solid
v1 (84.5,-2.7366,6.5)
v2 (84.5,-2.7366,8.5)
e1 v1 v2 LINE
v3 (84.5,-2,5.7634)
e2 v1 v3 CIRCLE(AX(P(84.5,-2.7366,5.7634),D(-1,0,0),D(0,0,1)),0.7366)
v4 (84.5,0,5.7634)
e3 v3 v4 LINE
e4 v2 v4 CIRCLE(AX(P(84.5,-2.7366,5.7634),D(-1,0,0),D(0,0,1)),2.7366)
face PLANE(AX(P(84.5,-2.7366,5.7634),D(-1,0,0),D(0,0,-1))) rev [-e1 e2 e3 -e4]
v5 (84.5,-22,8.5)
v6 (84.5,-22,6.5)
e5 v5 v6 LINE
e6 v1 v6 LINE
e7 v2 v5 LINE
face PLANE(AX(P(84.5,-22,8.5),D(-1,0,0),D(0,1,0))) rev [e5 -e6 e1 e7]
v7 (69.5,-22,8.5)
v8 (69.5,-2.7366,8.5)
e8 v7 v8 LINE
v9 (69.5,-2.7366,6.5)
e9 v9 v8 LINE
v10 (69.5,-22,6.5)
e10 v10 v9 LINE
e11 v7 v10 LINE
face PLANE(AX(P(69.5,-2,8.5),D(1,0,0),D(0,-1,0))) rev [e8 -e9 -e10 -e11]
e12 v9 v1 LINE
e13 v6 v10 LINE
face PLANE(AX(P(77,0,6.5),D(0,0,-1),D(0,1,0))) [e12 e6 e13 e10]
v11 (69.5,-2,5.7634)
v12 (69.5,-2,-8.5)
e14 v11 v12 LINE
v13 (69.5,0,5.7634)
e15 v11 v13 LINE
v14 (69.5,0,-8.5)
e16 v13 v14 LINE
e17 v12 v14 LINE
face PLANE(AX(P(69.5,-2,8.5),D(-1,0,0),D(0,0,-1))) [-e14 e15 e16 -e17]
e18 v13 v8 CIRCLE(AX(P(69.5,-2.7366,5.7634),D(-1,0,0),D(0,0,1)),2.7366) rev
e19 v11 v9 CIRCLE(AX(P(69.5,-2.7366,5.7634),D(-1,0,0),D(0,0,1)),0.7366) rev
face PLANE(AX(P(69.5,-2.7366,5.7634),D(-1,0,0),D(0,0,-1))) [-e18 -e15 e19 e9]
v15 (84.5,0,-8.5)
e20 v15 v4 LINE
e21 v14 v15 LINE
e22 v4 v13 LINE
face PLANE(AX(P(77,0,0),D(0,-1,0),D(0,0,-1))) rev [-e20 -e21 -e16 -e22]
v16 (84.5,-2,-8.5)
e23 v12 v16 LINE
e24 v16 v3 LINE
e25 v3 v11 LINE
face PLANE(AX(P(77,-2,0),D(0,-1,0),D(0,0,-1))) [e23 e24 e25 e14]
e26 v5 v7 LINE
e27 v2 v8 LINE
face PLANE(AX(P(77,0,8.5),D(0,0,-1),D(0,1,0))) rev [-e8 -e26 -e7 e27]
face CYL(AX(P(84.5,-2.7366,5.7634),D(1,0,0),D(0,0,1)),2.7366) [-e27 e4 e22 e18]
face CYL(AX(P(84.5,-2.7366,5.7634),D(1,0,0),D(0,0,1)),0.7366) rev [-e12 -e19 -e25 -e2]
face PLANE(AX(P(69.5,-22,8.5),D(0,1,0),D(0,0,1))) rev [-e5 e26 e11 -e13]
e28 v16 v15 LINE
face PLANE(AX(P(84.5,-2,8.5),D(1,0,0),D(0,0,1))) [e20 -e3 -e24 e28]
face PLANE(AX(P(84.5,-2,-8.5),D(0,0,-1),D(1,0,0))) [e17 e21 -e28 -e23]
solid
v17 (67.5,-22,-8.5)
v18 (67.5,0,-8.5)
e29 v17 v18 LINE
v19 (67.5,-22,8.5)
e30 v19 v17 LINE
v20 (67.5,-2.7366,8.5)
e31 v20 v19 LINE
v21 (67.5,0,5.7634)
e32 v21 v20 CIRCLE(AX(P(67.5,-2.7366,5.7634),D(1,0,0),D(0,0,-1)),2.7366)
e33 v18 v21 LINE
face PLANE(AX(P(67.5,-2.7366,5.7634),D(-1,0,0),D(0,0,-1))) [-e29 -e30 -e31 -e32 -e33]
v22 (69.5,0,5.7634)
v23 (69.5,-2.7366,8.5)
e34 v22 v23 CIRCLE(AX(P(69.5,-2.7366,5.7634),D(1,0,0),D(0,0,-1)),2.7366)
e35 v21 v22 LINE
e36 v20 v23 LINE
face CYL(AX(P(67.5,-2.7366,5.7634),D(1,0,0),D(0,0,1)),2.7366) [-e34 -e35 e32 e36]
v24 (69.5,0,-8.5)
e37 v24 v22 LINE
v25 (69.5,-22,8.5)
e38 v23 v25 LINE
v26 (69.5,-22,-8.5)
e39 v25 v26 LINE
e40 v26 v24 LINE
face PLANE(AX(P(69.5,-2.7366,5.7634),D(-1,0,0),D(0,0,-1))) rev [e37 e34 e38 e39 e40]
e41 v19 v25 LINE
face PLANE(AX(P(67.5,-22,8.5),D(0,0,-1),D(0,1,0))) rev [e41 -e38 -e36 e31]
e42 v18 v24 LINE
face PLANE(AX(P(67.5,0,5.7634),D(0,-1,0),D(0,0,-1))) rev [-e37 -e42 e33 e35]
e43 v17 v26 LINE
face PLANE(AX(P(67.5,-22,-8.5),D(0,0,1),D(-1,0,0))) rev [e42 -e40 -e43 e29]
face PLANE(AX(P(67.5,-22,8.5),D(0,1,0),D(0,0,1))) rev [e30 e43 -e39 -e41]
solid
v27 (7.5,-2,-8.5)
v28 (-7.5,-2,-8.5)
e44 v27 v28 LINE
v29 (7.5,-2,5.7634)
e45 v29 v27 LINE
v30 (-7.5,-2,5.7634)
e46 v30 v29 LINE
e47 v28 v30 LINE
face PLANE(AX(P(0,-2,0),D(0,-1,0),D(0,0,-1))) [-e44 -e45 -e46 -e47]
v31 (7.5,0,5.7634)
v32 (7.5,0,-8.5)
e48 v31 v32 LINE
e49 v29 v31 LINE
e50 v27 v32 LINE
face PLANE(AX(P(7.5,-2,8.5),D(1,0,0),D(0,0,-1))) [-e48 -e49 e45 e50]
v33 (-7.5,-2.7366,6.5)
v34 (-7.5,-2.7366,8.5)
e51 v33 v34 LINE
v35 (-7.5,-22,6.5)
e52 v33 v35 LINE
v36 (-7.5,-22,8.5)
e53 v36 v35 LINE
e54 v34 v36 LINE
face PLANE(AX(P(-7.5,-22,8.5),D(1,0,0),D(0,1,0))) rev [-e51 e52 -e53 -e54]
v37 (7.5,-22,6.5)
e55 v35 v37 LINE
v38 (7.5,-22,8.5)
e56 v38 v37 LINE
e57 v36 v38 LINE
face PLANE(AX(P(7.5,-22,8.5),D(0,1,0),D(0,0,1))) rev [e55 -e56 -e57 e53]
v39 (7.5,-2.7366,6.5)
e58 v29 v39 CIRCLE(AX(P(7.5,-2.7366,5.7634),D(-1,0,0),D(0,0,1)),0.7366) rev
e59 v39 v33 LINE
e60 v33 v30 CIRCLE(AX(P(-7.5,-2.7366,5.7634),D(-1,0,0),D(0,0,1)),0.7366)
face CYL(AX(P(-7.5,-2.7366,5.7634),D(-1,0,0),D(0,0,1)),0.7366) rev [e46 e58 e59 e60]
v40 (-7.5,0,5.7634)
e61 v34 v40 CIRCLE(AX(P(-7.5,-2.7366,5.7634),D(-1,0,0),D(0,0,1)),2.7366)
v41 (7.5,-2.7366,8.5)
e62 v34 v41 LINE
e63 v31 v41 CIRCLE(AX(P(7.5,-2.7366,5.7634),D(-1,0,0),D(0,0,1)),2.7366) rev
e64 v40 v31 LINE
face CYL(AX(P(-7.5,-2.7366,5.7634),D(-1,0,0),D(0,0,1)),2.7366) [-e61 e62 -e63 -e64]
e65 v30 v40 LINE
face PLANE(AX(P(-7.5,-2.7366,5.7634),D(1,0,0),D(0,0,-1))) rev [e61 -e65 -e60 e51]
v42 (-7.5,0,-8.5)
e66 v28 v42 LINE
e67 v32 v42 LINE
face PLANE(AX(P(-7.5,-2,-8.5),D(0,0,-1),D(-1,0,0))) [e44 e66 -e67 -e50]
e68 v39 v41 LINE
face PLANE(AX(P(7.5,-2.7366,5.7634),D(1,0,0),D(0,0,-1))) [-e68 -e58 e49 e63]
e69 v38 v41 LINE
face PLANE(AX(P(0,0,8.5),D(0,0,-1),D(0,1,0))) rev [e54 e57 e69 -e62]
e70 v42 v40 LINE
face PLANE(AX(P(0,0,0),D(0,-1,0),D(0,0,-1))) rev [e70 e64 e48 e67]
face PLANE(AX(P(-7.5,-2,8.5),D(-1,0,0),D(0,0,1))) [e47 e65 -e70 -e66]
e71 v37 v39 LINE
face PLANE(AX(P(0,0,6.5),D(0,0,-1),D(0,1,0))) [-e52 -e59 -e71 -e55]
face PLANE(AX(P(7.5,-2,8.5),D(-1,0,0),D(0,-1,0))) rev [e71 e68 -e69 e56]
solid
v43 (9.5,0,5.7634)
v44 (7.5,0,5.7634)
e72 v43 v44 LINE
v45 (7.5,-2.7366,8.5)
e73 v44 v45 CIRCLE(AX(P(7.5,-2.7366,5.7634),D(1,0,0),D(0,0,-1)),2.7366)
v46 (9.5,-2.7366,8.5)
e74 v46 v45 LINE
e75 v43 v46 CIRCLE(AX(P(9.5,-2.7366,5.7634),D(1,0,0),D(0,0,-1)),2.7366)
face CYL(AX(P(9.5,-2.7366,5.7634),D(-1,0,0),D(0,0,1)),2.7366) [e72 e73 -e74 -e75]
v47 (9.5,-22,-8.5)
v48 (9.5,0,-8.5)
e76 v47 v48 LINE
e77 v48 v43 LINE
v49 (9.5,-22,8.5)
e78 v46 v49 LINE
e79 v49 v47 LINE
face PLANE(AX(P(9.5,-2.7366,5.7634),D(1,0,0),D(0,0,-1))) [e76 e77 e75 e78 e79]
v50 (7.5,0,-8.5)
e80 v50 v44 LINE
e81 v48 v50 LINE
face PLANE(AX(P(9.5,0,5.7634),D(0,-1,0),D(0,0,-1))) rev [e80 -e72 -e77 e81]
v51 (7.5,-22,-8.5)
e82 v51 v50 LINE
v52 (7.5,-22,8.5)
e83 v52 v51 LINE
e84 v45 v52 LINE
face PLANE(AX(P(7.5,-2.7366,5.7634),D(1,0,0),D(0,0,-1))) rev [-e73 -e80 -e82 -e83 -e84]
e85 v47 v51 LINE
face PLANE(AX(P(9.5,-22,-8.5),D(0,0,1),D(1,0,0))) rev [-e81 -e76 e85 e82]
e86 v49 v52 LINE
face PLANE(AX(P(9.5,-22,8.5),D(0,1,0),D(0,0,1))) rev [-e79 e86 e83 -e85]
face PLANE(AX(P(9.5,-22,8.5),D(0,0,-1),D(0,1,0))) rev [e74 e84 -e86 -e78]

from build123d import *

# Parameters (mm, degrees)
SKETCH1_W                    = 15
SKETCH1_H                    = 17
BASE_FLANGE1_DEPTH           = 2
EDGE_FLANGE1_STRIP_W         = 9.4732
EDGE_FLANGE1_STRIP_H         = 2
EDGE_FLANGE1_STRIP_CUT_DEPTH = 15
EDGE_FLANGE1_DEPTH           = 15
BASE_FLANGE2_START           = 2
BASE_FLANGE2_DEPTH           = 2


# Sheet-metal steps are written as plain solids
with BuildPart() as part:
    # Sketch1 → Base-Flange1 (new body)
    with BuildSketch(Plane(origin=(0, 0, 0), x_dir=(1, 0, 0), z_dir=(0, 1, 0))):
        Rectangle(SKETCH1_W, SKETCH1_H)
    extrude(amount=-BASE_FLANGE1_DEPTH)

    # Edge-Flange1 strip (across the edge) → Edge-Flange1 strip cut (cut)
    with BuildSketch(Plane(origin=(7.5, -2, 8.5), x_dir=(0, 0, -1), z_dir=(-1, 0, 0))):
        with Locations((-2, -1)):
            Rectangle(EDGE_FLANGE1_STRIP_W, EDGE_FLANGE1_STRIP_H)
    extrude(amount=EDGE_FLANGE1_STRIP_CUT_DEPTH, mode=Mode.SUBTRACT)

    # Edge-Flange1 section (across the edge) → Edge-Flange1 (add)
    with BuildSketch(Plane(origin=(7.5, -2, 8.5), x_dir=(0, 0, -1), z_dir=(-1, 0, 0))):
        with BuildLine():
            Line((0, 0.7366), (0, 20))
            Line((0, 20), (2, 20))
            Line((2, 20), (2, 0.7366))
            ThreePointArc((2, 0.7366), (2.215745145, 0.215745145), (2.7366, 0))
            Line((2.7366, 0), (2.7366, -2))
            ThreePointArc((2.7366, -2), (0.801531583, -1.198468417), (0, 0.7366))
        make_face()
    extrude(amount=EDGE_FLANGE1_DEPTH)


with BuildPart() as body_2:
    # Sketch9 → Base-Flange2 (new body)
    with BuildSketch(Plane(origin=(7.5, 0, 0), x_dir=(0, 0, -1), z_dir=(1, 0, 0)).offset(BASE_FLANGE2_START)):
        with BuildLine():
            Line((-8.5, -22), (-8.5, -2.7366))
            ThreePointArc((-8.5, -2.7366), (-7.698468417, -0.801531583), (-5.7634, 0))
            Line((-5.7634, 0), (8.5, 0))
            Line((8.5, 0), (8.5, -22))
            Line((8.5, -22), (-8.5, -22))
        make_face()
    extrude(amount=-BASE_FLANGE2_DEPTH)


with BuildPart() as body_3:
    # Mirror1: mirrored copy
    add(part.part.mirror(Plane.ZY.offset(-38.5)))


with BuildPart() as body_4:
    # Mirror1 2: mirrored copy
    add(body_2.part.mirror(Plane.ZY.offset(-38.5)))


solid = Compound([part.part, body_2.part, body_3.part, body_4.part])
